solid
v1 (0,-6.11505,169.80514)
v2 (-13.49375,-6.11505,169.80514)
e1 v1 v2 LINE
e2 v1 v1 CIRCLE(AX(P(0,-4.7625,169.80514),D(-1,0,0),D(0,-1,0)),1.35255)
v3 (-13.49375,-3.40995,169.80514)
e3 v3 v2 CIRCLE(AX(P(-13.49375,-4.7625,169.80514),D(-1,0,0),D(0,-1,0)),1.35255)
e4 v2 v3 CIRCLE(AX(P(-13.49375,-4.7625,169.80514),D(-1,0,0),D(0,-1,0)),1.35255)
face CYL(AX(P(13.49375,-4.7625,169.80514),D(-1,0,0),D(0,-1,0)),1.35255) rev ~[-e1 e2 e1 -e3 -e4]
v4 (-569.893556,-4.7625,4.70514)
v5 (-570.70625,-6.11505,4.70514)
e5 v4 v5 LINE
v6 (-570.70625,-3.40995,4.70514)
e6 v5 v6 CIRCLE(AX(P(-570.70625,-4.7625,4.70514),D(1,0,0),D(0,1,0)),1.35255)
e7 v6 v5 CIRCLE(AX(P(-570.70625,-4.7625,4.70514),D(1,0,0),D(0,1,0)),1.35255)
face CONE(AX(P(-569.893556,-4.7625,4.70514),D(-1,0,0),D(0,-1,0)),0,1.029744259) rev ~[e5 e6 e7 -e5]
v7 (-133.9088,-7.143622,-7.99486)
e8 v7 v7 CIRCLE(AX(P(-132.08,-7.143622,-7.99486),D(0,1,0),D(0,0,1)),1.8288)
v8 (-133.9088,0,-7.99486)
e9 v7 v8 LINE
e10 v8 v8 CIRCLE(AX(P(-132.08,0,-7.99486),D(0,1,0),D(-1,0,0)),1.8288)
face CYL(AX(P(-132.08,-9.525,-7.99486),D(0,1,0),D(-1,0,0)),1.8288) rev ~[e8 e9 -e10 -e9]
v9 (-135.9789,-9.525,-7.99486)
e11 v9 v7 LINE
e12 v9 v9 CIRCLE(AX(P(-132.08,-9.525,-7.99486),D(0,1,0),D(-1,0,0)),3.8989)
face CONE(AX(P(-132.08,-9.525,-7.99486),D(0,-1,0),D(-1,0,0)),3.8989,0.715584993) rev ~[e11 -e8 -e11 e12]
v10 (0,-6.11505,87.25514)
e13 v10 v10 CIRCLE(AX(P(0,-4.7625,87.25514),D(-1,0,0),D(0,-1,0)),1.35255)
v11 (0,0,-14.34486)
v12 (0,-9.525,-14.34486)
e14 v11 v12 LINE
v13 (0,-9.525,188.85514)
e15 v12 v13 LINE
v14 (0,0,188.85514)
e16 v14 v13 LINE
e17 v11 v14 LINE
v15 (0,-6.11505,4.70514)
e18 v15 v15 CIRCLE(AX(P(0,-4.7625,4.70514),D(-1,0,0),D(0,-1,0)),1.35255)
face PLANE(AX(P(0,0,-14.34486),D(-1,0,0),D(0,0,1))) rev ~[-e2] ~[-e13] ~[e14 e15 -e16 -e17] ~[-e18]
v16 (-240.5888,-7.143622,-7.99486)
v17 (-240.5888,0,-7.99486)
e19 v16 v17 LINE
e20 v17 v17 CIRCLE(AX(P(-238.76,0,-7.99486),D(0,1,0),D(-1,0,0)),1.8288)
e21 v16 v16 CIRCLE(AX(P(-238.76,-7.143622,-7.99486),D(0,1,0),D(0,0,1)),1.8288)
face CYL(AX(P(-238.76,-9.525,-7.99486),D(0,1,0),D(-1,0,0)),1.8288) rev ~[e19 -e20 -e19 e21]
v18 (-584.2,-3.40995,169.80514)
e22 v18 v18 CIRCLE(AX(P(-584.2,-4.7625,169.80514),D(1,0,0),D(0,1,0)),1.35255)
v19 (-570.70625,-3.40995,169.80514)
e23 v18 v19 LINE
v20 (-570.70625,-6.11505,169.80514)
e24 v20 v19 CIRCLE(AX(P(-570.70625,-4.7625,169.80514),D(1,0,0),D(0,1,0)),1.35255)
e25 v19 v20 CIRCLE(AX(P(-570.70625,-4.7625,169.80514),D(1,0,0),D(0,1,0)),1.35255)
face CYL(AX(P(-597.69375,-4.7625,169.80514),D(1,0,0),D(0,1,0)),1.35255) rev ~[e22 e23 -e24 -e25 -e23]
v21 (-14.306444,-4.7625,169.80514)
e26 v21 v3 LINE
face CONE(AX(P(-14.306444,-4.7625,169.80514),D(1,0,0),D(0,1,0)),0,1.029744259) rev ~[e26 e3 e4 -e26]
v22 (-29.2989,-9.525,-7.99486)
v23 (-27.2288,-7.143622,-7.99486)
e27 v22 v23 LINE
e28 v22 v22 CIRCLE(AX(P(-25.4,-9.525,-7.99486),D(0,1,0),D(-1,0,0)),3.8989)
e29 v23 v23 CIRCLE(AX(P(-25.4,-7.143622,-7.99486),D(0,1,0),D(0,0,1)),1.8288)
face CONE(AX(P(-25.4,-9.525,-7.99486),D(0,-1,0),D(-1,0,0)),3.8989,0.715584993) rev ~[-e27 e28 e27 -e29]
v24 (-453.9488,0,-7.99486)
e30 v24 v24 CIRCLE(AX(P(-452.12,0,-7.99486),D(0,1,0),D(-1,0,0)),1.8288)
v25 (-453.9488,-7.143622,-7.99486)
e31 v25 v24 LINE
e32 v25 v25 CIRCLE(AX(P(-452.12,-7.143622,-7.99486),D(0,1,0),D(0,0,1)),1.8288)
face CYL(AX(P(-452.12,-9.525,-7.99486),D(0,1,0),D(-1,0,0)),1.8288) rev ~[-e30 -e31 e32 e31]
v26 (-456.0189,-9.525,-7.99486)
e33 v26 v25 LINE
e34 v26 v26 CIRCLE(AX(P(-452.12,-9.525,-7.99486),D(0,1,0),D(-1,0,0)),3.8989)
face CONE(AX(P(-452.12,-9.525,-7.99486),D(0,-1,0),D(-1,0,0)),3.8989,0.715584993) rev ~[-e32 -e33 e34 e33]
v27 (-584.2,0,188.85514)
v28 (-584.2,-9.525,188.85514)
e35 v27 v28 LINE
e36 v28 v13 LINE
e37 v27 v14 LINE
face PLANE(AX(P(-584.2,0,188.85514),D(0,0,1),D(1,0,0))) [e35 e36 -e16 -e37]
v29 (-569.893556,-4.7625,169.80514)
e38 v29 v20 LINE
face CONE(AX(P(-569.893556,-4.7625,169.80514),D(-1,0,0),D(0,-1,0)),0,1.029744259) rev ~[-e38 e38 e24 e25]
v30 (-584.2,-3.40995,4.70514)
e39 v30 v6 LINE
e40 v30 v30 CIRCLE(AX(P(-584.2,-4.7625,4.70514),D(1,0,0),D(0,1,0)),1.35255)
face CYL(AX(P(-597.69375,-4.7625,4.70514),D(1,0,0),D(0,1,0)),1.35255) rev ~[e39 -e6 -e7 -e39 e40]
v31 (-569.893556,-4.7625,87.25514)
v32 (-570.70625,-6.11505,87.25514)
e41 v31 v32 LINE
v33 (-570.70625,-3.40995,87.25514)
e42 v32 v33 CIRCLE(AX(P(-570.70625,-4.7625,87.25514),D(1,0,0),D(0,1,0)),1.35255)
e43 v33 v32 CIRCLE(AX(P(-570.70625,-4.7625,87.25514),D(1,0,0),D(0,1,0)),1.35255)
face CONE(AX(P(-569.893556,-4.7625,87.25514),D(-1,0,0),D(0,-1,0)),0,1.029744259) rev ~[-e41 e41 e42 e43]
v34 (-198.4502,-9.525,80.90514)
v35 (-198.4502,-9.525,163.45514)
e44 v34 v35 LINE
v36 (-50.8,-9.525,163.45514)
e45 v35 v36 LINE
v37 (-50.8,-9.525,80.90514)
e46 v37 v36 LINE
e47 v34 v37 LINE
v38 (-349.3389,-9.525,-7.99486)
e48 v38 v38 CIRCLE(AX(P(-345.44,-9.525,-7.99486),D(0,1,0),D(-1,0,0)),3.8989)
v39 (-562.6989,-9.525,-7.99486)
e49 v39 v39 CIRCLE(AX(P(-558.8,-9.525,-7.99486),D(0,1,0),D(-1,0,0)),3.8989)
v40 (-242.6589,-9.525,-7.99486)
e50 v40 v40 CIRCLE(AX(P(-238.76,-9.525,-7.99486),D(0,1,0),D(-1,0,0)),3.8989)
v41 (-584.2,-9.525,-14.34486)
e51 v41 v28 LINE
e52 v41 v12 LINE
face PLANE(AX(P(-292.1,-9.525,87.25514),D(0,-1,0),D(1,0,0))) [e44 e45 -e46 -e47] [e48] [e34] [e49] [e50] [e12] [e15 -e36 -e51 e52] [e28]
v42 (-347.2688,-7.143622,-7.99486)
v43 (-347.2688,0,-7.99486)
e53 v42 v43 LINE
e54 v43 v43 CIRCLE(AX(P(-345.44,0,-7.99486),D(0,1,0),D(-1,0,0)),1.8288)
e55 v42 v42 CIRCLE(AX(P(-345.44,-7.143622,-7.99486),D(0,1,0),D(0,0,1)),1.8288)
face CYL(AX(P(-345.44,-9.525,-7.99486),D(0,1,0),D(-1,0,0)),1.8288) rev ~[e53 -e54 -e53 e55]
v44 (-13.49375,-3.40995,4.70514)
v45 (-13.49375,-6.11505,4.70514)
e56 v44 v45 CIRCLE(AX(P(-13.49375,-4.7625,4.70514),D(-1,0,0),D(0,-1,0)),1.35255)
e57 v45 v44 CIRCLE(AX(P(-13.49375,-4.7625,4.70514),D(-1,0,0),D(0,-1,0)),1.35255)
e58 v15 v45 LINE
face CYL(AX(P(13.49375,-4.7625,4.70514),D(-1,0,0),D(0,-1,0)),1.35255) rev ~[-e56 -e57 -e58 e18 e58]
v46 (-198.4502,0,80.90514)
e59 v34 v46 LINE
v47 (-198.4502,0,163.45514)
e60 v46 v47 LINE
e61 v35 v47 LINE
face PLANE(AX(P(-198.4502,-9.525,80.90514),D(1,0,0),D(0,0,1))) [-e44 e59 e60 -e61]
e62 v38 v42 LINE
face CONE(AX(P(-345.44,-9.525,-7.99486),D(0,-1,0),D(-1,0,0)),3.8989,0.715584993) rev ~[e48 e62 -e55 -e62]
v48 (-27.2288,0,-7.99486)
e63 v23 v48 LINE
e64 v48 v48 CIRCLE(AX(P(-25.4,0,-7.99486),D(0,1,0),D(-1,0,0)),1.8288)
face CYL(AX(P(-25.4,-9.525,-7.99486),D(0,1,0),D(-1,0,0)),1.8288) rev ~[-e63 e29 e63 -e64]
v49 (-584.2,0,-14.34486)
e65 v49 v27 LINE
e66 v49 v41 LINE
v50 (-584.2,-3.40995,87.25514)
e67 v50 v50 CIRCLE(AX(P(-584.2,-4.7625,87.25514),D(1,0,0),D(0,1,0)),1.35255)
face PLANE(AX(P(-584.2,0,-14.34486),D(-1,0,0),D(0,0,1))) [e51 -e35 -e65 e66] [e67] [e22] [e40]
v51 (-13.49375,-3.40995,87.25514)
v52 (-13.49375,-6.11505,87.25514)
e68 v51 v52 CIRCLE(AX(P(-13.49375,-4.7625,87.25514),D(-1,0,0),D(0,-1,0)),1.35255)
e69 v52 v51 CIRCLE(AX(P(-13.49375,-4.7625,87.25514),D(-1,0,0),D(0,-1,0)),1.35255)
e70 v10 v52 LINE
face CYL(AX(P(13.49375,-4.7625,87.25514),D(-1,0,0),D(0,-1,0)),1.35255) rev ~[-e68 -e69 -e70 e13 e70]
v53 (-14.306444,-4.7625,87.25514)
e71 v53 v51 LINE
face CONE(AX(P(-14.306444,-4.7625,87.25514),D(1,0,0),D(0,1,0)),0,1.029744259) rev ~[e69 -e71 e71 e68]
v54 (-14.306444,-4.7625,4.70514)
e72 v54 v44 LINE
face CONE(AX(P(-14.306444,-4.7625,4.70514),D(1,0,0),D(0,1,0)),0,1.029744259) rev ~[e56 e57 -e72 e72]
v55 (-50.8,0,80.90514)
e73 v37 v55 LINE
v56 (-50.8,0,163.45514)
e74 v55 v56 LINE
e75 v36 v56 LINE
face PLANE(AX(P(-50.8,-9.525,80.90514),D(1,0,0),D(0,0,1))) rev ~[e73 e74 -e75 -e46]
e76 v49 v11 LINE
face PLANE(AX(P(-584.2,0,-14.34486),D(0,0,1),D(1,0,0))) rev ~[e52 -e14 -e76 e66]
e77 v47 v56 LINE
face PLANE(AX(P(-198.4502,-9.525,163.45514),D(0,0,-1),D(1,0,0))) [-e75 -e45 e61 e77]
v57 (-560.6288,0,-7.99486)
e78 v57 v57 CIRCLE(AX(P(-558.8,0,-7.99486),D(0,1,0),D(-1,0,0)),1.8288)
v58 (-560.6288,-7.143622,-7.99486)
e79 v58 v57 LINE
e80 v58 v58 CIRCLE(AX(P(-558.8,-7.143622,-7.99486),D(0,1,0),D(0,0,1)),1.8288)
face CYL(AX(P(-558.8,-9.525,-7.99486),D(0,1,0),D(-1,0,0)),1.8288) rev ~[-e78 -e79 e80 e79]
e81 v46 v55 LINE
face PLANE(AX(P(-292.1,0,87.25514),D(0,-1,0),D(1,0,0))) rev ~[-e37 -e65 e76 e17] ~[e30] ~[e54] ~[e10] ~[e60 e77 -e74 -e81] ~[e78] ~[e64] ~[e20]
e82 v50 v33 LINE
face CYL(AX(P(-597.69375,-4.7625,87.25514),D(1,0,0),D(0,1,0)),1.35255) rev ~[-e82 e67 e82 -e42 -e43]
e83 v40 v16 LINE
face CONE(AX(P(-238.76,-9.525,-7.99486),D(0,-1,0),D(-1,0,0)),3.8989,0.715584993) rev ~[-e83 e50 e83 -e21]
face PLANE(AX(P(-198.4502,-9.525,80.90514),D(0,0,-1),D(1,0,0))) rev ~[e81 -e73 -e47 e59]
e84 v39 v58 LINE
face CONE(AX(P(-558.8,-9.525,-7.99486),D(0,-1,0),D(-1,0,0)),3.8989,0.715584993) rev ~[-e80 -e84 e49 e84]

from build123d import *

# Parameters (mm, degrees)
F0_W           = 584.2
F0_H           = 203.2
F1_DEPTH       = 9.525
F3_D           = 3.6576
F3_DEPTH       = 10.3124
F3_CSINK_D     = 7.7978
F3_CSINK_ANGLE = 82
F3_TIP         = 1.0988539001
F4_W           = 147.6502
F4_H           = 82.55
F5_DEPTH       = 9.526
F7_D           = 2.7051
F7_DEPTH       = 13.49375
F7_TIP         = 0.8126940303
F9_D           = 2.7051
F9_DEPTH       = 13.49375
F9_TIP         = 0.8126940303


# Not quite as in the source:
# - a feature names something its author has since deleted; it is built from what else it names


with BuildPart() as f1:
    # F0 (on Front) → F1 (new body)
    with BuildSketch(Plane.XZ):
        with Locations((-292.1, 87.2551402715)):
            Rectangle(F0_W, F0_H)
    extrude(amount=F1_DEPTH)

    # F3
    with Locations(Plane.XZ.offset(9.525)):
        with Locations((-558.8, -7.9948597285), (-345.44, -7.9948597285), (-452.12, -7.9948597285), (-238.76, -7.9948597285), (-132.08, -7.9948597285), (-25.4, -7.9948597285)):
            CounterSinkHole(F3_D / 2, F3_CSINK_D / 2, depth=F3_DEPTH, counter_sink_angle=F3_CSINK_ANGLE)
            with Locations((0, 0, -(F3_DEPTH + F3_TIP / 2))):  # 118° drill point
                Cone(0, F3_D / 2, F3_TIP, mode=Mode.SUBTRACT)

    # F4 (on face) → F5 (cut, through all)
    with BuildSketch(Plane.XZ.offset(9.525)):
        with Locations((-124.6251, 122.1801402715)):
            Rectangle(F4_W, F4_H)
    extrude(amount=-F5_DEPTH, mode=Mode.SUBTRACT)

    # F7
    with Locations(Plane(origin=(-584.2, 0, 0), x_dir=(0, -1, 0), z_dir=(-1, 0, 0))):
        with Locations((4.7625, 169.8051402715), (4.7625, 87.2551402715), (4.7625, 4.7051402715)):
            Hole(F7_D / 2, depth=F7_DEPTH)
            with Locations((0, 0, -(F7_DEPTH + F7_TIP / 2))):  # 118° drill point
                Cone(0, F7_D / 2, F7_TIP, mode=Mode.SUBTRACT)

    # F9
    with Locations(Plane.YZ):
        with Locations((-4.7625, 4.7051402715), (-4.7625, 87.2551402715), (-4.7625, 169.8051402715)):
            Hole(F9_D / 2, depth=F9_DEPTH)
            with Locations((0, 0, -(F9_DEPTH + F9_TIP / 2))):  # 118° drill point
                Cone(0, F9_D / 2, F9_TIP, mode=Mode.SUBTRACT)


solid = f1.part
